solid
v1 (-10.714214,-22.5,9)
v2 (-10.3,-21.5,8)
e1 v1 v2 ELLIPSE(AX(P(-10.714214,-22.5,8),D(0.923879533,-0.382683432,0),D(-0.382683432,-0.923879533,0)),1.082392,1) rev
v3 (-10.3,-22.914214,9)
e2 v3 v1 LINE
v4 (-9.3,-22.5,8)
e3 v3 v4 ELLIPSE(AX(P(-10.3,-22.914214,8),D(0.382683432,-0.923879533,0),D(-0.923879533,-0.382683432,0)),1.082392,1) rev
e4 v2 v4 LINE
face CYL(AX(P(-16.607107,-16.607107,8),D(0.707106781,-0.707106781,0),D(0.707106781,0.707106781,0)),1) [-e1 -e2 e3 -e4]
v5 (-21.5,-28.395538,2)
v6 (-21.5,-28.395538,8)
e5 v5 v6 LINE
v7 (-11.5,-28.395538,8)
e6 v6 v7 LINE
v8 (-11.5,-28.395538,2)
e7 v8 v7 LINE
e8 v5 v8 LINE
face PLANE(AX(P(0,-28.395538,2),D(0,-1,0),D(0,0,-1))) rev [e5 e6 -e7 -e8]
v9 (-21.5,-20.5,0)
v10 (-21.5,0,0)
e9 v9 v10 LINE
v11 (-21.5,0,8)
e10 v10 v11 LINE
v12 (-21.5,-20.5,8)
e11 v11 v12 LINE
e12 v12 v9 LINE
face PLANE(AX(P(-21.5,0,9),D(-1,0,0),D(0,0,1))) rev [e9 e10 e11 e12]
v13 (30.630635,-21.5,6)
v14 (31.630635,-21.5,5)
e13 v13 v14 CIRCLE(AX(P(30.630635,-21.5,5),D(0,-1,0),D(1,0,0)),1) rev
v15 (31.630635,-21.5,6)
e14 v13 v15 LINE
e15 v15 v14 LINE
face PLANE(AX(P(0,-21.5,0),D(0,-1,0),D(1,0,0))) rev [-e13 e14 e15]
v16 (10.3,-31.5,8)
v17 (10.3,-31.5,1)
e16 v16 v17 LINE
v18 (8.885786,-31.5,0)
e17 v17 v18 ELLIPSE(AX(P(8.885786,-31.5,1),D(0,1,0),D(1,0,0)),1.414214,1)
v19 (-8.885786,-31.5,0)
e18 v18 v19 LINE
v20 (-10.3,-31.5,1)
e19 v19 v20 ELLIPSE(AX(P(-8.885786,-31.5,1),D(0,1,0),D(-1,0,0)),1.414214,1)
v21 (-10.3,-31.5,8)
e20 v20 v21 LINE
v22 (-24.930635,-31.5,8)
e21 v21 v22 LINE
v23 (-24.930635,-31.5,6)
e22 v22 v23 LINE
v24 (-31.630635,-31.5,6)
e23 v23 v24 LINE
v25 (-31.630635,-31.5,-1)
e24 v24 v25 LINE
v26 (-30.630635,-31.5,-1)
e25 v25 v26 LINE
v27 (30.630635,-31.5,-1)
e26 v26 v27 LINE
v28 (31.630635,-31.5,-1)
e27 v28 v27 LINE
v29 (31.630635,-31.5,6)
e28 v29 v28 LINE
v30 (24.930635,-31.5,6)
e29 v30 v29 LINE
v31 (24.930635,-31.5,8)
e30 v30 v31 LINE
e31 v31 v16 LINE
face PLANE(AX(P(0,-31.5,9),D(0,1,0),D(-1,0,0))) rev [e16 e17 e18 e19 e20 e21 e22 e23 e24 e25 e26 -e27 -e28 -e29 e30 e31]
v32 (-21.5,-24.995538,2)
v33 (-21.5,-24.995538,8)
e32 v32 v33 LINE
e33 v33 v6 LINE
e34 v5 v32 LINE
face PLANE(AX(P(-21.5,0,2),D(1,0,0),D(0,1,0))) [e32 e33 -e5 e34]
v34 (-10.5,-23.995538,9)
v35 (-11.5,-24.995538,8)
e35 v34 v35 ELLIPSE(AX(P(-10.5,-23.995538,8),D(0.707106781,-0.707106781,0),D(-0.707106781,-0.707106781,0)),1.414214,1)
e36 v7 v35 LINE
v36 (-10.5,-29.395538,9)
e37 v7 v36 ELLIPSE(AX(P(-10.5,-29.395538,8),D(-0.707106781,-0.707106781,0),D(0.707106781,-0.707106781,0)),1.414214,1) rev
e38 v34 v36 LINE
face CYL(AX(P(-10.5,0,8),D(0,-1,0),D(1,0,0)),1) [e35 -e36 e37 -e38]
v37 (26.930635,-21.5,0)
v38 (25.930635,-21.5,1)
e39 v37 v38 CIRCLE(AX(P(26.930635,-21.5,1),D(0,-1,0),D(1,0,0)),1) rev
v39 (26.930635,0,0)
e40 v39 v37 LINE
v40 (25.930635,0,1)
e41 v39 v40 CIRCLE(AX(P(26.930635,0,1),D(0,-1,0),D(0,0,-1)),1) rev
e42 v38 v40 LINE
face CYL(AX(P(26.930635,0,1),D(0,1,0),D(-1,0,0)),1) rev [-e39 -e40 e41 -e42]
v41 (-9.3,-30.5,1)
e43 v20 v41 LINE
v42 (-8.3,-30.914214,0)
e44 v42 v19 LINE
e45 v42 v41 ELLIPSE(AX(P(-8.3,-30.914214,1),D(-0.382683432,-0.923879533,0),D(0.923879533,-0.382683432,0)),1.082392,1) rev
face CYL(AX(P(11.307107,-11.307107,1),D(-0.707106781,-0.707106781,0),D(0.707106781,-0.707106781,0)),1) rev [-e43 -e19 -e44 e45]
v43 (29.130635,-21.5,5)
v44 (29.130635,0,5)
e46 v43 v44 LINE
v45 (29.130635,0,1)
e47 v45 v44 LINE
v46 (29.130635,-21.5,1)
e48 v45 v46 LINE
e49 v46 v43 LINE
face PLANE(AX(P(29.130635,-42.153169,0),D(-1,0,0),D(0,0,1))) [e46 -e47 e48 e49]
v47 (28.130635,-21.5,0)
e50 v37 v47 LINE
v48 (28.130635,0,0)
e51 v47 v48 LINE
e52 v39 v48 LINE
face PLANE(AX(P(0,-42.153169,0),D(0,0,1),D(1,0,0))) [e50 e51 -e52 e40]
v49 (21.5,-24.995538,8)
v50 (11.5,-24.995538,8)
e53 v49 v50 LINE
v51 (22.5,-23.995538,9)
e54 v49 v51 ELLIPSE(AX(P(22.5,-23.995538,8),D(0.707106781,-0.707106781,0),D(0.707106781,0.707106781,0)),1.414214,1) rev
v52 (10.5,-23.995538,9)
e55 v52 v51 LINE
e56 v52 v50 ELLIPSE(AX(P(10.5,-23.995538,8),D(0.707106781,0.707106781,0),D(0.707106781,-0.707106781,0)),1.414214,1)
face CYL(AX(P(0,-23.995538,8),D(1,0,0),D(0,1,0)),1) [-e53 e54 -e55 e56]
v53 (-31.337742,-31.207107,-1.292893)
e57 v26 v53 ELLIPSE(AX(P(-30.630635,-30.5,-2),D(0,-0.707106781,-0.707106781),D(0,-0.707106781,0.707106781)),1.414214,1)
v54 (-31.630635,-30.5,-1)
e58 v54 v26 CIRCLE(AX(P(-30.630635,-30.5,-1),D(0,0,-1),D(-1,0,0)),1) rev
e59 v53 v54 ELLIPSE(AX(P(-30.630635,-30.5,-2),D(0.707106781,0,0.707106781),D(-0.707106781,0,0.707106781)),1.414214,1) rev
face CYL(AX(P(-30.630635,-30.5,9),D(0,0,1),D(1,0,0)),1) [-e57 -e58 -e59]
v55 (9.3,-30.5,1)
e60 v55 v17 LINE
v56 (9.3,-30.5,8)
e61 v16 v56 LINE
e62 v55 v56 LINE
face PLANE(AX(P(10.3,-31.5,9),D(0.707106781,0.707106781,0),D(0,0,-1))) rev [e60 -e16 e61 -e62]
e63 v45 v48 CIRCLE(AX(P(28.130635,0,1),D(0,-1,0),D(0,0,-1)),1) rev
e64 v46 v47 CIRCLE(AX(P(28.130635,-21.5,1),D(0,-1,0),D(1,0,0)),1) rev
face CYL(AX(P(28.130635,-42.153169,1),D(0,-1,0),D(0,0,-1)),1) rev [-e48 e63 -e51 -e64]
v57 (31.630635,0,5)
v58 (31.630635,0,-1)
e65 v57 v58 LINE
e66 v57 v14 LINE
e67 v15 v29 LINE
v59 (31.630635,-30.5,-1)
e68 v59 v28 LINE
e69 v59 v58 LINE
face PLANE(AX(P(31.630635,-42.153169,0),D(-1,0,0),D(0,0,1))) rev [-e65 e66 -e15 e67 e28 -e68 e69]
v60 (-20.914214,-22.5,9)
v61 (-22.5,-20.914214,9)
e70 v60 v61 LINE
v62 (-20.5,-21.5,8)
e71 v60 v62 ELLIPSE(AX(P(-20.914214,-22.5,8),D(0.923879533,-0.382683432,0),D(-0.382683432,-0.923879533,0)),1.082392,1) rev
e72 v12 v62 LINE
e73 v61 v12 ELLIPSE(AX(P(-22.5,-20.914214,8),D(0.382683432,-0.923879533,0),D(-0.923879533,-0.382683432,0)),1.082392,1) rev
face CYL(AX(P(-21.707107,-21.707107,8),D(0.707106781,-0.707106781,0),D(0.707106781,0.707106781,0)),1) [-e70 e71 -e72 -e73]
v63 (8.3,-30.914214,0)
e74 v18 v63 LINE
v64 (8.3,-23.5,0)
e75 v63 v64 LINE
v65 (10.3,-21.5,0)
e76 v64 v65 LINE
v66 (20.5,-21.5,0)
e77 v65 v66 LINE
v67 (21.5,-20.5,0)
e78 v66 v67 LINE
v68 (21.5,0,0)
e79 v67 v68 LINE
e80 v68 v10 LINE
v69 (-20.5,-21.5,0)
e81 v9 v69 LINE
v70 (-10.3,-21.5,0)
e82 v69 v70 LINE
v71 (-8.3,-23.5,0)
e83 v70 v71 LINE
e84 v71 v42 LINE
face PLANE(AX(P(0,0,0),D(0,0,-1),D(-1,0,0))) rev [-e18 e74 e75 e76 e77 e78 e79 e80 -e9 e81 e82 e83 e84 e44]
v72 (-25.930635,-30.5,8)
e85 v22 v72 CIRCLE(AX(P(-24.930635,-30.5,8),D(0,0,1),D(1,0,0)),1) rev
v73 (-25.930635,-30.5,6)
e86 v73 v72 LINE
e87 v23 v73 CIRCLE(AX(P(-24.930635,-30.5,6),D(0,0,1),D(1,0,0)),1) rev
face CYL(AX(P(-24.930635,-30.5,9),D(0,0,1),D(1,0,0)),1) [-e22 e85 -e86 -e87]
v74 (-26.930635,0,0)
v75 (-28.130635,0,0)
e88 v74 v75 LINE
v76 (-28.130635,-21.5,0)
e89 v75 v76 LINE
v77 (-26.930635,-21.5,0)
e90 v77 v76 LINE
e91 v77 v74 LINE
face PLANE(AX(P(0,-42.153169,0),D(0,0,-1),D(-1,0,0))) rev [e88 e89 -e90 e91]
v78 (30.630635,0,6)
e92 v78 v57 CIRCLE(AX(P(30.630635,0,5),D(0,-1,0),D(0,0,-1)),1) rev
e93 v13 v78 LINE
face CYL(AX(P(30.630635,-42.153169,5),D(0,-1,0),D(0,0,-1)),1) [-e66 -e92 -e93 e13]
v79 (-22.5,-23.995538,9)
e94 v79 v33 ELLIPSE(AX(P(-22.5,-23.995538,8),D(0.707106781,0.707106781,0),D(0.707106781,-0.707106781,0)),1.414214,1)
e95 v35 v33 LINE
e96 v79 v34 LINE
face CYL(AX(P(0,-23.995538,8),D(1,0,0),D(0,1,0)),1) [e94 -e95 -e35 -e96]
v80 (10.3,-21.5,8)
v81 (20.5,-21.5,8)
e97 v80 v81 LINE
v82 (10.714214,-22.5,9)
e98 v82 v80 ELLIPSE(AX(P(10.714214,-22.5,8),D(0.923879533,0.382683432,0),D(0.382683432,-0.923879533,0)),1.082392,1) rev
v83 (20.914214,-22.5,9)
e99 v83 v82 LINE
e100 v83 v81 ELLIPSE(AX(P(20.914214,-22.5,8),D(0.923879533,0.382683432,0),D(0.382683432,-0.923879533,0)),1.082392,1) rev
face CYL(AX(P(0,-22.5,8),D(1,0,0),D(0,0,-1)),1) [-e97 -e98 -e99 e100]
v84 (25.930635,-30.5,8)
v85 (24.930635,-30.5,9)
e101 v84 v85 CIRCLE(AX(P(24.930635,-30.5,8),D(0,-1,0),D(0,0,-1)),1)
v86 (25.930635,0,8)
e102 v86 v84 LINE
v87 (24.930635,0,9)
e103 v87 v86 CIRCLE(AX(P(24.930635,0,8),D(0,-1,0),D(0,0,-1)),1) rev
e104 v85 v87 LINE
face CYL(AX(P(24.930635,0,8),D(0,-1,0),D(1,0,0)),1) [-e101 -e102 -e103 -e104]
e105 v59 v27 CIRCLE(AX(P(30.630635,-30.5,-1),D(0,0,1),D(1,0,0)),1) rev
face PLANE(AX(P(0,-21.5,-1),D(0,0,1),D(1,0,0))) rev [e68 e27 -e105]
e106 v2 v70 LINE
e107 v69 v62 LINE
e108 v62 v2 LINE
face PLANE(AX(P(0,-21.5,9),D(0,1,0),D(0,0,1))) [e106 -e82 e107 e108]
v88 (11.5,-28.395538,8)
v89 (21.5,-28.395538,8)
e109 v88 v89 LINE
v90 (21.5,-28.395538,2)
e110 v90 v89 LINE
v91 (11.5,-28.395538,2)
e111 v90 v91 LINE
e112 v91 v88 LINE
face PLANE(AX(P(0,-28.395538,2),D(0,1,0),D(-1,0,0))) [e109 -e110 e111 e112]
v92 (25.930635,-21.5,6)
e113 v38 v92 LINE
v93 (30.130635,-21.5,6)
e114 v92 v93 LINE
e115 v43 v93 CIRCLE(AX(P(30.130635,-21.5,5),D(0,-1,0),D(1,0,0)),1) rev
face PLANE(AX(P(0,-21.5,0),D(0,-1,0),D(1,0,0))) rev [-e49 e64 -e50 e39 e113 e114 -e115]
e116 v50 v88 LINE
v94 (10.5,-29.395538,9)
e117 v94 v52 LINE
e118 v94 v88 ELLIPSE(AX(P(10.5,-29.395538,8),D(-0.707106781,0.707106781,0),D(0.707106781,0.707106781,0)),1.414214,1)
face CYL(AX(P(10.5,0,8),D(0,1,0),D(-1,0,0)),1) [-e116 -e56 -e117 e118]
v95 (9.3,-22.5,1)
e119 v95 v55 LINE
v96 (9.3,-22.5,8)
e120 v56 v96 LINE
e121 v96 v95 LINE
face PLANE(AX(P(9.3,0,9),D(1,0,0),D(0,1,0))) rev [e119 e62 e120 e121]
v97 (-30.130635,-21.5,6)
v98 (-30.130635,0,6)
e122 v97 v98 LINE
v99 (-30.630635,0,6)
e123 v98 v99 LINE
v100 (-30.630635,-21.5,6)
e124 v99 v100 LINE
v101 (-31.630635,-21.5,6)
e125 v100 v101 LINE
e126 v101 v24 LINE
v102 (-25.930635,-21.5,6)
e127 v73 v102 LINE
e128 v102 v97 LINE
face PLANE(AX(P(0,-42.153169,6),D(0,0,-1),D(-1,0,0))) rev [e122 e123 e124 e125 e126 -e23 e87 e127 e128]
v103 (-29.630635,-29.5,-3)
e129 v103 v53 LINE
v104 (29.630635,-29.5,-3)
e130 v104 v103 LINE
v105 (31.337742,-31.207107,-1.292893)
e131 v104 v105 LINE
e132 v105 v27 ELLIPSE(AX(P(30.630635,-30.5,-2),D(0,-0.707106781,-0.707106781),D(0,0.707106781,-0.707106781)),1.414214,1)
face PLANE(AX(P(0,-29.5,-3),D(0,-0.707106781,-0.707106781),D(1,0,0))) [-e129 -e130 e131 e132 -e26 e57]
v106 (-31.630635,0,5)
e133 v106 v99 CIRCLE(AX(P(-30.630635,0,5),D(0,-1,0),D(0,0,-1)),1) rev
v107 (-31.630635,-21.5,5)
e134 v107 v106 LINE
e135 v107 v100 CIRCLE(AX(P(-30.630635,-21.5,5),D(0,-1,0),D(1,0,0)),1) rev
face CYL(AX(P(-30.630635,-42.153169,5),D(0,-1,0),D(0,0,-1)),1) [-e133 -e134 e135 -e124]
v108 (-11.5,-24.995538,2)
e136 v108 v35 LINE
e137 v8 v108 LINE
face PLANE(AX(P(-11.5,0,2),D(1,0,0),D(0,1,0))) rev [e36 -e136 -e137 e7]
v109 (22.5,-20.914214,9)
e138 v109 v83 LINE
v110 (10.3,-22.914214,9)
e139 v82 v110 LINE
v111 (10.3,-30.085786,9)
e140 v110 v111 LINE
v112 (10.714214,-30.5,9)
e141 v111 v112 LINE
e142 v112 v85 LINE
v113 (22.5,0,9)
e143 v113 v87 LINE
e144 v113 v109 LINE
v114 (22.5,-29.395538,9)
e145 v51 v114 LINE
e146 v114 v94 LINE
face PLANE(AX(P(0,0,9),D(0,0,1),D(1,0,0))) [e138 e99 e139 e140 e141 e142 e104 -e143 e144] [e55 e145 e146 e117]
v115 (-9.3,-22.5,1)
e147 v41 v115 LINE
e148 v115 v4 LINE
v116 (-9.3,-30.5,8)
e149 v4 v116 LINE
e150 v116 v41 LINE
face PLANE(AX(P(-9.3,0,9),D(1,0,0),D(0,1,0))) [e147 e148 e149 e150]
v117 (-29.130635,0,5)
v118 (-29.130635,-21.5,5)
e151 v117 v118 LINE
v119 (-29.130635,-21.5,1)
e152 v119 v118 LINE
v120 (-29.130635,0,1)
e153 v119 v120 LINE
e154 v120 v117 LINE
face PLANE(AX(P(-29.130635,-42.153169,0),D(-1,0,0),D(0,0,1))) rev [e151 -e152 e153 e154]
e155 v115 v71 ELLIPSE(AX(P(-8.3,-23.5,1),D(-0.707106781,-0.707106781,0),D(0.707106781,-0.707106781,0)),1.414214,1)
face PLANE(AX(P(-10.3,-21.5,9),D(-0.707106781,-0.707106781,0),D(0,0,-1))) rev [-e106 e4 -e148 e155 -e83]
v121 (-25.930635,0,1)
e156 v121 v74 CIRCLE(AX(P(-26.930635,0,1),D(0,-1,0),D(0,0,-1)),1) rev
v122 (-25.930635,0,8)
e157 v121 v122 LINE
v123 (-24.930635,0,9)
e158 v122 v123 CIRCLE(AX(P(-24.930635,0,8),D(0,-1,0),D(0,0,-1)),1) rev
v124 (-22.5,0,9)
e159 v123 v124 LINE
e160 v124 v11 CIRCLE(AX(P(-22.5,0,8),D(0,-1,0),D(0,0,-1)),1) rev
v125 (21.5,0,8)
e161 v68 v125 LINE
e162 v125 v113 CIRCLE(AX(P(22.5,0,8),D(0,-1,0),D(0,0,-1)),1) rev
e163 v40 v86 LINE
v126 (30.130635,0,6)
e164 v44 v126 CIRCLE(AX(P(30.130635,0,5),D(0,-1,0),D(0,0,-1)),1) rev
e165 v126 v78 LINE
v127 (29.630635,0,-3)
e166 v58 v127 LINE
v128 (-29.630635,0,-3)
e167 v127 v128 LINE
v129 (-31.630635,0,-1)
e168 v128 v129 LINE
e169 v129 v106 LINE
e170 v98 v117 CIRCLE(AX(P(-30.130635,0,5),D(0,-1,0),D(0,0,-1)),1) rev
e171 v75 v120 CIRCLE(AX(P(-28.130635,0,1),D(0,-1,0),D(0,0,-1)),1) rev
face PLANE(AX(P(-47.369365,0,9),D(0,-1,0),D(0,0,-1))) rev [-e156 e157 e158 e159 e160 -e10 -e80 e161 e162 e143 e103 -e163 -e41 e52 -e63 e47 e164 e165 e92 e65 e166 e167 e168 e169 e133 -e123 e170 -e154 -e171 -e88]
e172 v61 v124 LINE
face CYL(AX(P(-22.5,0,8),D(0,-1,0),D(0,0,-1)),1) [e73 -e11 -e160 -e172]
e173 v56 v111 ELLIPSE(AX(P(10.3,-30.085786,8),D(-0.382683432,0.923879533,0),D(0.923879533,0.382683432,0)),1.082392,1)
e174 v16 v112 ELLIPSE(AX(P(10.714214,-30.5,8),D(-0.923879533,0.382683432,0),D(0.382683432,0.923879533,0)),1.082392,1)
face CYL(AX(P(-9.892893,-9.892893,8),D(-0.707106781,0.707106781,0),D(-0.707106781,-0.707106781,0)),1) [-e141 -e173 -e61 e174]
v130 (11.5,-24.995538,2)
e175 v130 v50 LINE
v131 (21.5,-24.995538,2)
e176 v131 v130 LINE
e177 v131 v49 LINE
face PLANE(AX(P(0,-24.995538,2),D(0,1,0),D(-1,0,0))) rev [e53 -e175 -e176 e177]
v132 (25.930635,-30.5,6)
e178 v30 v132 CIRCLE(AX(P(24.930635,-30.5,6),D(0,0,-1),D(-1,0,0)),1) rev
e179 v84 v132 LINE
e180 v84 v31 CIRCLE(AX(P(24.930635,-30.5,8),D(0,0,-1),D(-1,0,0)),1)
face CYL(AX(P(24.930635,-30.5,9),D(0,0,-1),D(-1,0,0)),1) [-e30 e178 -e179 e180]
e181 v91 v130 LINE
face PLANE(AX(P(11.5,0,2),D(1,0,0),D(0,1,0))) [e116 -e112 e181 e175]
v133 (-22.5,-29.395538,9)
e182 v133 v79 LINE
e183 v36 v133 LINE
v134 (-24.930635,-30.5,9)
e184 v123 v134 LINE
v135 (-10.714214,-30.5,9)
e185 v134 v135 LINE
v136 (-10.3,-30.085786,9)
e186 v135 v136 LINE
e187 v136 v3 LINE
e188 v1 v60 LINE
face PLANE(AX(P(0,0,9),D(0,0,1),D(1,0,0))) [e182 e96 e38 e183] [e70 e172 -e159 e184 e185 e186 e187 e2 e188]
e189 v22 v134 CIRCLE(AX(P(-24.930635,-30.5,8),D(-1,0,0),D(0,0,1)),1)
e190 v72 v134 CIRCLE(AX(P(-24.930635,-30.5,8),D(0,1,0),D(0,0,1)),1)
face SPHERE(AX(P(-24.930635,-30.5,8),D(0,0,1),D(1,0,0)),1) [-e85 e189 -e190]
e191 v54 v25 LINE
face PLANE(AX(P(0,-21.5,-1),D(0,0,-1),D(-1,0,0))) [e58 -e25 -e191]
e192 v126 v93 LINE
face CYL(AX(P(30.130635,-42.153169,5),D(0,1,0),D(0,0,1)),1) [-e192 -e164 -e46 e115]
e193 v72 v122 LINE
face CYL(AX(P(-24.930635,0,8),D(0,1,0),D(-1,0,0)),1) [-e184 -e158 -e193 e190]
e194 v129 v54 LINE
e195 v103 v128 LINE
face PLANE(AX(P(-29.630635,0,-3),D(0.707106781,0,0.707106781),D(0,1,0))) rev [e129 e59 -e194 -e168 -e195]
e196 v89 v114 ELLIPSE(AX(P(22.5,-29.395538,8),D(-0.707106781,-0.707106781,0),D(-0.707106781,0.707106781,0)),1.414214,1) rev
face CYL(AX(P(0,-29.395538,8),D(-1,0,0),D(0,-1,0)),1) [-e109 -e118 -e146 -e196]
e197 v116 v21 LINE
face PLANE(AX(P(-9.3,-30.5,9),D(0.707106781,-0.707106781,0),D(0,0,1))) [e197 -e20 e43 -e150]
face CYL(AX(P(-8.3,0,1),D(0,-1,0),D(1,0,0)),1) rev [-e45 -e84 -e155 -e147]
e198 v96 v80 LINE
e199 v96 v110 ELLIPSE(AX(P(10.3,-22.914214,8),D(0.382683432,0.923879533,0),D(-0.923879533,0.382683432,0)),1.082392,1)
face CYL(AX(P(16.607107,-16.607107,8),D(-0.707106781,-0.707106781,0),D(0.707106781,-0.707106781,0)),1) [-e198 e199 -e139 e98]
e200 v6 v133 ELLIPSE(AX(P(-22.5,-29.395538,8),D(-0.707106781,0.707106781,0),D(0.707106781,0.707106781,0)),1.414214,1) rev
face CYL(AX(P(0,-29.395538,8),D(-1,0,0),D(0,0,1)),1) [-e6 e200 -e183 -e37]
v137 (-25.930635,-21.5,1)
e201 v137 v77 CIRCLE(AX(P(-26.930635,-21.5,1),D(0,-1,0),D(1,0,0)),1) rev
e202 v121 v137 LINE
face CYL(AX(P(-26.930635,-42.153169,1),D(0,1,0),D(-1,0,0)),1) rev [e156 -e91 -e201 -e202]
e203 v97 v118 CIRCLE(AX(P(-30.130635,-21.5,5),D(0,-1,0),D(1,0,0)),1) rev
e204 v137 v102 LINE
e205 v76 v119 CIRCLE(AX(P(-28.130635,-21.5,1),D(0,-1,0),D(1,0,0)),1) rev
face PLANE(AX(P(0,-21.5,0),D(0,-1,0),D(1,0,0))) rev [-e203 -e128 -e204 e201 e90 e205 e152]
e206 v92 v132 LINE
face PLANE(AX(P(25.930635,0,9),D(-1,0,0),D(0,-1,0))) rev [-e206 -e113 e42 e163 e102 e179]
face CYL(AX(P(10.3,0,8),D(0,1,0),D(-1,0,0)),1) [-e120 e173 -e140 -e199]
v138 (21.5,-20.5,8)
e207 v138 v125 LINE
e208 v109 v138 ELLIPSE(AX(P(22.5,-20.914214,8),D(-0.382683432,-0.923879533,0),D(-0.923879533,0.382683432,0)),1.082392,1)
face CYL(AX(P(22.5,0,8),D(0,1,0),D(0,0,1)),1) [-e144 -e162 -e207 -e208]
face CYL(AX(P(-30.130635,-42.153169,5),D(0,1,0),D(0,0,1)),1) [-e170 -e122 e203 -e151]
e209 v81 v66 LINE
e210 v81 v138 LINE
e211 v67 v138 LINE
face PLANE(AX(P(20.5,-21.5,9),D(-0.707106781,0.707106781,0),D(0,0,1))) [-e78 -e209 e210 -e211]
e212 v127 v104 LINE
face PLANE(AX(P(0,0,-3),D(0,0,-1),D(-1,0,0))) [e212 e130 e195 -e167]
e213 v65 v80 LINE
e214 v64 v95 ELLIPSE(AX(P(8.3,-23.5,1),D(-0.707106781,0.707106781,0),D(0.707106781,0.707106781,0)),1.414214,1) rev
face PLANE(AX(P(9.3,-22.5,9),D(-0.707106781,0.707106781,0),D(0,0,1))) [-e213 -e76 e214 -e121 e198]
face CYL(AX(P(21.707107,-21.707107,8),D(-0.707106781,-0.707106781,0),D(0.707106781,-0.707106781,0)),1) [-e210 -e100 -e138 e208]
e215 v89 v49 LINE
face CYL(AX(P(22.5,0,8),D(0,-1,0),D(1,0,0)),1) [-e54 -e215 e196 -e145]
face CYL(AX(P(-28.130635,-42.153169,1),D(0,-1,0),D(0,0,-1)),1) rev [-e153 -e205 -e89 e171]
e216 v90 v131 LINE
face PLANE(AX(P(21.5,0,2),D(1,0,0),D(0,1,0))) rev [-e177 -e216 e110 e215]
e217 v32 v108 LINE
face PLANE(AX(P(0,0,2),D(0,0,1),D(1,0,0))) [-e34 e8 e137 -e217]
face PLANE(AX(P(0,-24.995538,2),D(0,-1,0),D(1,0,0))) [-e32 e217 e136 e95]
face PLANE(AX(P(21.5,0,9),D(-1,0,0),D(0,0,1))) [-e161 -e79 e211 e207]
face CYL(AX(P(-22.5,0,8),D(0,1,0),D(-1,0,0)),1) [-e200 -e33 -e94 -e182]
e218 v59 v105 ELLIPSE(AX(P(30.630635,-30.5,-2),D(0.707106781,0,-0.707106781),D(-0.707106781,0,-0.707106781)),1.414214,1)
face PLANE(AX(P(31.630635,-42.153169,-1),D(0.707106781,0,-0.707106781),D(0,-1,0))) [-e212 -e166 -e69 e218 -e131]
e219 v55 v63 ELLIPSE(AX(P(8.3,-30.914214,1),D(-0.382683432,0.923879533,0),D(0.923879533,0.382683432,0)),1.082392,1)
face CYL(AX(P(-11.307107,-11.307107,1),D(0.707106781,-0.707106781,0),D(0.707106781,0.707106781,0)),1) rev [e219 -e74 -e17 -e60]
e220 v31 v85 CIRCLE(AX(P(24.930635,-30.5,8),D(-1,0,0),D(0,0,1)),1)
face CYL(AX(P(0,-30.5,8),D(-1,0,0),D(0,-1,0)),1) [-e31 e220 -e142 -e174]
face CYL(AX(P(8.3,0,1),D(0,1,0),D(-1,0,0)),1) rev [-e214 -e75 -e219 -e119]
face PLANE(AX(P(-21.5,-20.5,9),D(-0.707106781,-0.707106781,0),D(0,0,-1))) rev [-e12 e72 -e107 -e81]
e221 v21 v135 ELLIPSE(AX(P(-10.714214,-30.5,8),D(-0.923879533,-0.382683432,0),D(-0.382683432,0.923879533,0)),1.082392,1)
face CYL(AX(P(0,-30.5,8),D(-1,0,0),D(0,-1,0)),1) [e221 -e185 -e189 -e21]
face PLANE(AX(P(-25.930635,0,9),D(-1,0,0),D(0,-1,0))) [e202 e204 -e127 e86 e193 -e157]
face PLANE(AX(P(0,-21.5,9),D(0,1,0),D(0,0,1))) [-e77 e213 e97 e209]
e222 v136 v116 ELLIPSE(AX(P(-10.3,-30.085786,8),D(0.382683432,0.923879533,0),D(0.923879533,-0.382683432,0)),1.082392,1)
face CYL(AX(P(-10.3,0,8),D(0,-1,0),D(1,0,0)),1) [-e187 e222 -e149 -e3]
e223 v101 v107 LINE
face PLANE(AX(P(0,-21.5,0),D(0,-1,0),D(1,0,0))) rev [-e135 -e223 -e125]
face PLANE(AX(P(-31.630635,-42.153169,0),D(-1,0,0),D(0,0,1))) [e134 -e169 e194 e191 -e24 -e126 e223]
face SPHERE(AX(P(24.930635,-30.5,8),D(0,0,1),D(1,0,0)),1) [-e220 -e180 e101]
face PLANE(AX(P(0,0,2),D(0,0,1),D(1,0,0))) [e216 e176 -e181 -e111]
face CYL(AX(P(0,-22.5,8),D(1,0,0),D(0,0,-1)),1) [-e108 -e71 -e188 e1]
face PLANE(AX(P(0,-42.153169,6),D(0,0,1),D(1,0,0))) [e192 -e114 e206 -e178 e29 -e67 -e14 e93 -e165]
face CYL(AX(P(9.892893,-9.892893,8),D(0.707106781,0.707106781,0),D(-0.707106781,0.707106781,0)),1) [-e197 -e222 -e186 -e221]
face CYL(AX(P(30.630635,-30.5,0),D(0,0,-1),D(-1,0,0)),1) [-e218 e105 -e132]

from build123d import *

# Parameters (mm, degrees)
BOSS_EXTRU_2_DEPTH      = 9
ESQUISSE3_W             = 51.8612703
ESQUISSE3_H             = 63
BOSS_EXTRU_3_DEPTH      = 3
ESQUISSE4_W             = 10
ESQUISSE4_H             = 3.4
ENL_V_MAT_EXTRU_1_DEPTH = 7
ESQUISSE5_W             = 3.2
ESQUISSE5_H             = 3
BOSS_EXTRU_4_DEPTH      = 63
CHANFREIN1_SIZE         = 1
CHANFREIN2_SIZE         = 2
CONG_1_R                = 1
CONG_2_R                = 1
CHANFREIN4_SIZE         = 1
CONG_4_R                = 1
CONG_5_R                = 1
ESQUISSE6_W             = 6.7
ESQUISSE6_H             = 1
BOSS_EXTRU_5_DEPTH      = 10
ESQUISSE7_W             = 25.281431527
ESQUISSE7_H             = 35.175981147
ENL_V_MAT_EXTRU_2_DEPTH = 79


with BuildPart() as part:
    # Esquisse2 → Boss.-Extru.2 (new body)
    with BuildSketch(Plane.XY):
        Polygon((-9.3, -31.5), (-9.3, -21.5), (-21.5, -21.5), (-21.5, 21.5), (21.5, 21.5), (21.5, -21.5), (9.3, -21.5), (9.3, -31.5), (25.93063515, -31.5), (25.93063515, 31.5), (-25.93063515, 31.5), (-25.93063515, -31.5), align=None)
    extrude(amount=BOSS_EXTRU_2_DEPTH)

    # Esquisse3 → Boss.-Extru.3 (add)
    with BuildSketch(Plane(origin=(0, 0, 0), x_dir=(-1, 0, 0), z_dir=(0, 0, -1))):
        Rectangle(ESQUISSE3_W, ESQUISSE3_H)
    extrude(amount=BOSS_EXTRU_3_DEPTH)

    # Esquisse4 → Enlèv. mat.-Extru.1 (cut)
    with BuildSketch(Plane.XY.offset(9)):
        with Locations((-16.5, -26.695538472)):
            Rectangle(ESQUISSE4_W, ESQUISSE4_H)
        with Locations((16.5, -26.695538472)):
            Rectangle(ESQUISSE4_W, ESQUISSE4_H)
        with Locations((16.5, 26.695538472)):
            Rectangle(ESQUISSE4_W, ESQUISSE4_H)
        with Locations((-16.5, 26.695538472)):
            Rectangle(ESQUISSE4_W, ESQUISSE4_H)
    extrude(amount=-ENL_V_MAT_EXTRU_1_DEPTH, mode=Mode.SUBTRACT)

    # Esquisse5 → Boss.-Extru.4 (add)
    with BuildSketch(Plane(origin=(0, 31.5, 0), x_dir=(1, 0, 0), z_dir=(0, 1, 0))):
        Polygon((-29.13063515, 0), (-29.13063515, 3), (-31.63063515, 3), (-31.63063515, -6), (-29.13063515, -6), align=None)
        with Locations((-27.53063515, 1.5)):
            Rectangle(ESQUISSE5_W, ESQUISSE5_H)
        with Locations((27.53063515, 1.5)):
            Rectangle(ESQUISSE5_W, ESQUISSE5_H)
        Polygon((29.13063515, 3), (29.13063515, 0), (29.13063515, -6), (31.63063515, -6), (31.63063515, 3), align=None)
    extrude(amount=-BOSS_EXTRU_4_DEPTH)

    # Chanfrein1
    chanfrein1_edges = [part.edges().sort_by_distance(p)[0] for p in [
        (21.5, -21.5, 4.5),
        (21.5, 21.5, 4.5),
        (-21.5, 21.5, 4.5),
        (-21.5, -21.5, 4.5),
    ]]
    chamfer(chanfrein1_edges, length=CHANFREIN1_SIZE)

    # Chanfrein2
    chanfrein2_edges = [part.edges().sort_by_distance(p)[0] for p in [
        (-31.63063515, 0, -3),
        (31.63063515, 0, -3),
        (0, -31.5, -3),
        (0, 31.5, -3),
    ]]
    chamfer(chanfrein2_edges, length=CHANFREIN2_SIZE)

    # Congé1
    cong_1_edges = [part.edges().sort_by_distance(p)[0] for p in [
        (-25.93063515, 0, 0),
        (-29.13063515, 0, 0),
        (-29.13063515, 0, 6),
        (-31.63063515, 0, 6),
        (25.93063515, 0, 0),
        (29.13063515, 0, 0),
        (29.13063515, 0, 6),
        (31.63063515, 0, 6),
    ]]
    fillet(cong_1_edges, radius=CONG_1_R)

    # Congé2
    cong_2_edges = [part.edges().sort_by_distance(p)[0] for p in [
        (-31.63063515, 31.5, 2),
        (31.63063515, 31.5, 2),
        (30.38063515, -31.5, 6),
        (30.38063515, 31.5, 6),
        (-30.38063515, 31.5, 6),
        (-29.13063515, 31.5, 3),
        (-27.53063515, 31.5, 0),
        (27.53063515, 31.5, 0),
        (29.13063515, 31.5, 3),
        (-31.337741931, 31.5, 5.707106781),
        (-29.423528369, 31.5, 5.707106781),
        (29.423528369, 31.5, 5.707106781),
        (31.337741931, 31.5, 5.707106781),
        (31.63063515, -31.5, 2),
        (-31.63063515, -31.5, 2),
        (29.13063515, -31.5, 3),
        (27.53063515, -31.5, 0),
        (-27.53063515, -31.5, 0),
        (-29.13063515, -31.5, 3),
        (-30.38063515, -31.5, 6),
        (-31.337741931, -31.5, 5.707106781),
        (-29.423528369, -31.5, 5.707106781),
        (29.423528369, -31.5, 5.707106781),
        (31.337741931, -31.5, 5.707106781),
        (28.837741931, 31.5, 0.292893219),
        (28.837741931, -31.5, 0.292893219),
        (26.223528369, 31.5, 0.292893219),
        (26.223528369, -31.5, 0.292893219),
        (-28.837741931, 31.5, 0.292893219),
        (-28.837741931, -31.5, 0.292893219),
        (-26.223528369, 31.5, 0.292893219),
        (-26.223528369, -31.5, 0.292893219),
        (-25.93063515, -31.5, 5),
        (-25.93063515, 31.5, 5),
        (25.93063515, 31.5, 5),
        (25.93063515, -31.5, 5),
    ]]
    fillet(cong_2_edges, radius=CONG_2_R - 0.0001)  # a hair under: the kernel refuses the full size

    # Chanfrein4
    chanfrein4_edges = [part.edges().sort_by_distance(p)[0] for p in [
        (-9.3, -31.5, 4.5),
        (9.3, -31.5, 4.5),
        (9.3, -21.5, 4.5),
        (-9.3, -21.5, 4.5),
    ]]
    chamfer(chanfrein4_edges, length=CHANFREIN4_SIZE)

    # Congé4
    cong_4_edges = [part.edges().sort_by_distance(p)[0] for p in [
        (-21.5, 0, 9),
        (-15.4, -21.5, 9),
        (21.5, 0, 9),
        (0, 21.5, 9),
        (-21, -21, 9),
        (21, -21, 9),
        (21, 21, 9),
        (-21, 21, 9),
        (0, 31.5, 9),
        (-17.615367575, -31.5, 9),
        (-25.93063515, 0, 9),
        (25.93063515, 0, 9),
        (25.63777122, 31.207136071, 9),
        (25.63777122, -31.207136071, 9),
        (-25.63777122, -31.207136071, 9),
        (-25.63777122, 31.207136071, 9),
        (17.615367575, -31.5, 9),
        (9.3, -26.5, 9),
        (-9.3, -26.5, 9),
        (15.4, -21.5, 9),
        (-9.8, -22, 9),
        (9.8, -22, 9),
        (-9.8, -31, 9),
        (9.8, -31, 9),
        (-16.5, 28.395538472, 9),
        (-11.5, 26.695538472, 9),
        (-21.5, 26.695538472, 9),
        (-16.5, 24.995538472, 9),
        (21.5, 26.695538472, 9),
        (16.5, 24.995538472, 9),
        (16.5, 28.395538472, 9),
        (11.5, 26.695538472, 9),
        (16.5, -28.395538472, 9),
        (11.5, -26.695538472, 9),
        (21.5, -26.695538472, 9),
        (16.5, -24.995538472, 9),
        (-21.5, -26.695538472, 9),
        (-16.5, -24.995538472, 9),
        (-16.5, -28.395538472, 9),
        (-11.5, -26.695538472, 9),
    ]]
    fillet(cong_4_edges, radius=CONG_4_R - 0.0001)  # a hair under: the kernel refuses the full size

    # Congé5
    cong_5_edges = [part.edges().sort_by_distance(p)[0] for p in [
        (9.3, -26.5, 0),
        (-9.3, -26.5, 0),
        (9.8, -31, 0),
        (-9.8, -31, 0),
    ]]
    fillet(cong_5_edges, radius=CONG_5_R)

    # Esquisse6 → Boss.-Extru.5 (add)
    with BuildSketch(Plane.XZ.offset(31.5)):
        with BuildLine():
            Line((-24.93063515, 1), (-24.93063515, 5))
            Line((-24.93063515, 5), (-31.63063515, 5))
            Line((-31.63063515, 5), (-31.63063515, -1))
            Line((-31.63063515, -1), (-26.93063515, -1))
            ThreePointArc((-26.93063515, -1), (-25.516421587, -0.414213562), (-24.93063515, 1))
        make_face()
        with Locations((-28.28063515, 5.5)):
            Rectangle(ESQUISSE6_W, ESQUISSE6_H)
        with BuildLine():
            Line((31.63063515, -1), (31.63063515, 5))
            Line((31.63063515, 5), (24.93063515, 5))
            Line((24.93063515, 5), (24.93063515, 1))
            ThreePointArc((24.93063515, 1), (25.516421587, -0.414213562), (26.93063515, -1))
            Line((26.93063515, -1), (31.63063515, -1))
        make_face()
        with Locations((28.28063515, 5.5)):
            Rectangle(ESQUISSE6_W, ESQUISSE6_H)
    extrude(amount=-BOSS_EXTRU_5_DEPTH)

    # Esquisse7 → Enlèv. mat.-Extru.2 (cut)
    with BuildSketch(Plane(origin=(31.63063515, 0, 0), x_dir=(0, 0, -1), z_dir=(1, 0, 0))):
        with Locations((3.640715764, 17.587990574)):
            Rectangle(ESQUISSE7_W, ESQUISSE7_H)
    extrude(amount=-ENL_V_MAT_EXTRU_2_DEPTH, mode=Mode.SUBTRACT)


solid = part.part
